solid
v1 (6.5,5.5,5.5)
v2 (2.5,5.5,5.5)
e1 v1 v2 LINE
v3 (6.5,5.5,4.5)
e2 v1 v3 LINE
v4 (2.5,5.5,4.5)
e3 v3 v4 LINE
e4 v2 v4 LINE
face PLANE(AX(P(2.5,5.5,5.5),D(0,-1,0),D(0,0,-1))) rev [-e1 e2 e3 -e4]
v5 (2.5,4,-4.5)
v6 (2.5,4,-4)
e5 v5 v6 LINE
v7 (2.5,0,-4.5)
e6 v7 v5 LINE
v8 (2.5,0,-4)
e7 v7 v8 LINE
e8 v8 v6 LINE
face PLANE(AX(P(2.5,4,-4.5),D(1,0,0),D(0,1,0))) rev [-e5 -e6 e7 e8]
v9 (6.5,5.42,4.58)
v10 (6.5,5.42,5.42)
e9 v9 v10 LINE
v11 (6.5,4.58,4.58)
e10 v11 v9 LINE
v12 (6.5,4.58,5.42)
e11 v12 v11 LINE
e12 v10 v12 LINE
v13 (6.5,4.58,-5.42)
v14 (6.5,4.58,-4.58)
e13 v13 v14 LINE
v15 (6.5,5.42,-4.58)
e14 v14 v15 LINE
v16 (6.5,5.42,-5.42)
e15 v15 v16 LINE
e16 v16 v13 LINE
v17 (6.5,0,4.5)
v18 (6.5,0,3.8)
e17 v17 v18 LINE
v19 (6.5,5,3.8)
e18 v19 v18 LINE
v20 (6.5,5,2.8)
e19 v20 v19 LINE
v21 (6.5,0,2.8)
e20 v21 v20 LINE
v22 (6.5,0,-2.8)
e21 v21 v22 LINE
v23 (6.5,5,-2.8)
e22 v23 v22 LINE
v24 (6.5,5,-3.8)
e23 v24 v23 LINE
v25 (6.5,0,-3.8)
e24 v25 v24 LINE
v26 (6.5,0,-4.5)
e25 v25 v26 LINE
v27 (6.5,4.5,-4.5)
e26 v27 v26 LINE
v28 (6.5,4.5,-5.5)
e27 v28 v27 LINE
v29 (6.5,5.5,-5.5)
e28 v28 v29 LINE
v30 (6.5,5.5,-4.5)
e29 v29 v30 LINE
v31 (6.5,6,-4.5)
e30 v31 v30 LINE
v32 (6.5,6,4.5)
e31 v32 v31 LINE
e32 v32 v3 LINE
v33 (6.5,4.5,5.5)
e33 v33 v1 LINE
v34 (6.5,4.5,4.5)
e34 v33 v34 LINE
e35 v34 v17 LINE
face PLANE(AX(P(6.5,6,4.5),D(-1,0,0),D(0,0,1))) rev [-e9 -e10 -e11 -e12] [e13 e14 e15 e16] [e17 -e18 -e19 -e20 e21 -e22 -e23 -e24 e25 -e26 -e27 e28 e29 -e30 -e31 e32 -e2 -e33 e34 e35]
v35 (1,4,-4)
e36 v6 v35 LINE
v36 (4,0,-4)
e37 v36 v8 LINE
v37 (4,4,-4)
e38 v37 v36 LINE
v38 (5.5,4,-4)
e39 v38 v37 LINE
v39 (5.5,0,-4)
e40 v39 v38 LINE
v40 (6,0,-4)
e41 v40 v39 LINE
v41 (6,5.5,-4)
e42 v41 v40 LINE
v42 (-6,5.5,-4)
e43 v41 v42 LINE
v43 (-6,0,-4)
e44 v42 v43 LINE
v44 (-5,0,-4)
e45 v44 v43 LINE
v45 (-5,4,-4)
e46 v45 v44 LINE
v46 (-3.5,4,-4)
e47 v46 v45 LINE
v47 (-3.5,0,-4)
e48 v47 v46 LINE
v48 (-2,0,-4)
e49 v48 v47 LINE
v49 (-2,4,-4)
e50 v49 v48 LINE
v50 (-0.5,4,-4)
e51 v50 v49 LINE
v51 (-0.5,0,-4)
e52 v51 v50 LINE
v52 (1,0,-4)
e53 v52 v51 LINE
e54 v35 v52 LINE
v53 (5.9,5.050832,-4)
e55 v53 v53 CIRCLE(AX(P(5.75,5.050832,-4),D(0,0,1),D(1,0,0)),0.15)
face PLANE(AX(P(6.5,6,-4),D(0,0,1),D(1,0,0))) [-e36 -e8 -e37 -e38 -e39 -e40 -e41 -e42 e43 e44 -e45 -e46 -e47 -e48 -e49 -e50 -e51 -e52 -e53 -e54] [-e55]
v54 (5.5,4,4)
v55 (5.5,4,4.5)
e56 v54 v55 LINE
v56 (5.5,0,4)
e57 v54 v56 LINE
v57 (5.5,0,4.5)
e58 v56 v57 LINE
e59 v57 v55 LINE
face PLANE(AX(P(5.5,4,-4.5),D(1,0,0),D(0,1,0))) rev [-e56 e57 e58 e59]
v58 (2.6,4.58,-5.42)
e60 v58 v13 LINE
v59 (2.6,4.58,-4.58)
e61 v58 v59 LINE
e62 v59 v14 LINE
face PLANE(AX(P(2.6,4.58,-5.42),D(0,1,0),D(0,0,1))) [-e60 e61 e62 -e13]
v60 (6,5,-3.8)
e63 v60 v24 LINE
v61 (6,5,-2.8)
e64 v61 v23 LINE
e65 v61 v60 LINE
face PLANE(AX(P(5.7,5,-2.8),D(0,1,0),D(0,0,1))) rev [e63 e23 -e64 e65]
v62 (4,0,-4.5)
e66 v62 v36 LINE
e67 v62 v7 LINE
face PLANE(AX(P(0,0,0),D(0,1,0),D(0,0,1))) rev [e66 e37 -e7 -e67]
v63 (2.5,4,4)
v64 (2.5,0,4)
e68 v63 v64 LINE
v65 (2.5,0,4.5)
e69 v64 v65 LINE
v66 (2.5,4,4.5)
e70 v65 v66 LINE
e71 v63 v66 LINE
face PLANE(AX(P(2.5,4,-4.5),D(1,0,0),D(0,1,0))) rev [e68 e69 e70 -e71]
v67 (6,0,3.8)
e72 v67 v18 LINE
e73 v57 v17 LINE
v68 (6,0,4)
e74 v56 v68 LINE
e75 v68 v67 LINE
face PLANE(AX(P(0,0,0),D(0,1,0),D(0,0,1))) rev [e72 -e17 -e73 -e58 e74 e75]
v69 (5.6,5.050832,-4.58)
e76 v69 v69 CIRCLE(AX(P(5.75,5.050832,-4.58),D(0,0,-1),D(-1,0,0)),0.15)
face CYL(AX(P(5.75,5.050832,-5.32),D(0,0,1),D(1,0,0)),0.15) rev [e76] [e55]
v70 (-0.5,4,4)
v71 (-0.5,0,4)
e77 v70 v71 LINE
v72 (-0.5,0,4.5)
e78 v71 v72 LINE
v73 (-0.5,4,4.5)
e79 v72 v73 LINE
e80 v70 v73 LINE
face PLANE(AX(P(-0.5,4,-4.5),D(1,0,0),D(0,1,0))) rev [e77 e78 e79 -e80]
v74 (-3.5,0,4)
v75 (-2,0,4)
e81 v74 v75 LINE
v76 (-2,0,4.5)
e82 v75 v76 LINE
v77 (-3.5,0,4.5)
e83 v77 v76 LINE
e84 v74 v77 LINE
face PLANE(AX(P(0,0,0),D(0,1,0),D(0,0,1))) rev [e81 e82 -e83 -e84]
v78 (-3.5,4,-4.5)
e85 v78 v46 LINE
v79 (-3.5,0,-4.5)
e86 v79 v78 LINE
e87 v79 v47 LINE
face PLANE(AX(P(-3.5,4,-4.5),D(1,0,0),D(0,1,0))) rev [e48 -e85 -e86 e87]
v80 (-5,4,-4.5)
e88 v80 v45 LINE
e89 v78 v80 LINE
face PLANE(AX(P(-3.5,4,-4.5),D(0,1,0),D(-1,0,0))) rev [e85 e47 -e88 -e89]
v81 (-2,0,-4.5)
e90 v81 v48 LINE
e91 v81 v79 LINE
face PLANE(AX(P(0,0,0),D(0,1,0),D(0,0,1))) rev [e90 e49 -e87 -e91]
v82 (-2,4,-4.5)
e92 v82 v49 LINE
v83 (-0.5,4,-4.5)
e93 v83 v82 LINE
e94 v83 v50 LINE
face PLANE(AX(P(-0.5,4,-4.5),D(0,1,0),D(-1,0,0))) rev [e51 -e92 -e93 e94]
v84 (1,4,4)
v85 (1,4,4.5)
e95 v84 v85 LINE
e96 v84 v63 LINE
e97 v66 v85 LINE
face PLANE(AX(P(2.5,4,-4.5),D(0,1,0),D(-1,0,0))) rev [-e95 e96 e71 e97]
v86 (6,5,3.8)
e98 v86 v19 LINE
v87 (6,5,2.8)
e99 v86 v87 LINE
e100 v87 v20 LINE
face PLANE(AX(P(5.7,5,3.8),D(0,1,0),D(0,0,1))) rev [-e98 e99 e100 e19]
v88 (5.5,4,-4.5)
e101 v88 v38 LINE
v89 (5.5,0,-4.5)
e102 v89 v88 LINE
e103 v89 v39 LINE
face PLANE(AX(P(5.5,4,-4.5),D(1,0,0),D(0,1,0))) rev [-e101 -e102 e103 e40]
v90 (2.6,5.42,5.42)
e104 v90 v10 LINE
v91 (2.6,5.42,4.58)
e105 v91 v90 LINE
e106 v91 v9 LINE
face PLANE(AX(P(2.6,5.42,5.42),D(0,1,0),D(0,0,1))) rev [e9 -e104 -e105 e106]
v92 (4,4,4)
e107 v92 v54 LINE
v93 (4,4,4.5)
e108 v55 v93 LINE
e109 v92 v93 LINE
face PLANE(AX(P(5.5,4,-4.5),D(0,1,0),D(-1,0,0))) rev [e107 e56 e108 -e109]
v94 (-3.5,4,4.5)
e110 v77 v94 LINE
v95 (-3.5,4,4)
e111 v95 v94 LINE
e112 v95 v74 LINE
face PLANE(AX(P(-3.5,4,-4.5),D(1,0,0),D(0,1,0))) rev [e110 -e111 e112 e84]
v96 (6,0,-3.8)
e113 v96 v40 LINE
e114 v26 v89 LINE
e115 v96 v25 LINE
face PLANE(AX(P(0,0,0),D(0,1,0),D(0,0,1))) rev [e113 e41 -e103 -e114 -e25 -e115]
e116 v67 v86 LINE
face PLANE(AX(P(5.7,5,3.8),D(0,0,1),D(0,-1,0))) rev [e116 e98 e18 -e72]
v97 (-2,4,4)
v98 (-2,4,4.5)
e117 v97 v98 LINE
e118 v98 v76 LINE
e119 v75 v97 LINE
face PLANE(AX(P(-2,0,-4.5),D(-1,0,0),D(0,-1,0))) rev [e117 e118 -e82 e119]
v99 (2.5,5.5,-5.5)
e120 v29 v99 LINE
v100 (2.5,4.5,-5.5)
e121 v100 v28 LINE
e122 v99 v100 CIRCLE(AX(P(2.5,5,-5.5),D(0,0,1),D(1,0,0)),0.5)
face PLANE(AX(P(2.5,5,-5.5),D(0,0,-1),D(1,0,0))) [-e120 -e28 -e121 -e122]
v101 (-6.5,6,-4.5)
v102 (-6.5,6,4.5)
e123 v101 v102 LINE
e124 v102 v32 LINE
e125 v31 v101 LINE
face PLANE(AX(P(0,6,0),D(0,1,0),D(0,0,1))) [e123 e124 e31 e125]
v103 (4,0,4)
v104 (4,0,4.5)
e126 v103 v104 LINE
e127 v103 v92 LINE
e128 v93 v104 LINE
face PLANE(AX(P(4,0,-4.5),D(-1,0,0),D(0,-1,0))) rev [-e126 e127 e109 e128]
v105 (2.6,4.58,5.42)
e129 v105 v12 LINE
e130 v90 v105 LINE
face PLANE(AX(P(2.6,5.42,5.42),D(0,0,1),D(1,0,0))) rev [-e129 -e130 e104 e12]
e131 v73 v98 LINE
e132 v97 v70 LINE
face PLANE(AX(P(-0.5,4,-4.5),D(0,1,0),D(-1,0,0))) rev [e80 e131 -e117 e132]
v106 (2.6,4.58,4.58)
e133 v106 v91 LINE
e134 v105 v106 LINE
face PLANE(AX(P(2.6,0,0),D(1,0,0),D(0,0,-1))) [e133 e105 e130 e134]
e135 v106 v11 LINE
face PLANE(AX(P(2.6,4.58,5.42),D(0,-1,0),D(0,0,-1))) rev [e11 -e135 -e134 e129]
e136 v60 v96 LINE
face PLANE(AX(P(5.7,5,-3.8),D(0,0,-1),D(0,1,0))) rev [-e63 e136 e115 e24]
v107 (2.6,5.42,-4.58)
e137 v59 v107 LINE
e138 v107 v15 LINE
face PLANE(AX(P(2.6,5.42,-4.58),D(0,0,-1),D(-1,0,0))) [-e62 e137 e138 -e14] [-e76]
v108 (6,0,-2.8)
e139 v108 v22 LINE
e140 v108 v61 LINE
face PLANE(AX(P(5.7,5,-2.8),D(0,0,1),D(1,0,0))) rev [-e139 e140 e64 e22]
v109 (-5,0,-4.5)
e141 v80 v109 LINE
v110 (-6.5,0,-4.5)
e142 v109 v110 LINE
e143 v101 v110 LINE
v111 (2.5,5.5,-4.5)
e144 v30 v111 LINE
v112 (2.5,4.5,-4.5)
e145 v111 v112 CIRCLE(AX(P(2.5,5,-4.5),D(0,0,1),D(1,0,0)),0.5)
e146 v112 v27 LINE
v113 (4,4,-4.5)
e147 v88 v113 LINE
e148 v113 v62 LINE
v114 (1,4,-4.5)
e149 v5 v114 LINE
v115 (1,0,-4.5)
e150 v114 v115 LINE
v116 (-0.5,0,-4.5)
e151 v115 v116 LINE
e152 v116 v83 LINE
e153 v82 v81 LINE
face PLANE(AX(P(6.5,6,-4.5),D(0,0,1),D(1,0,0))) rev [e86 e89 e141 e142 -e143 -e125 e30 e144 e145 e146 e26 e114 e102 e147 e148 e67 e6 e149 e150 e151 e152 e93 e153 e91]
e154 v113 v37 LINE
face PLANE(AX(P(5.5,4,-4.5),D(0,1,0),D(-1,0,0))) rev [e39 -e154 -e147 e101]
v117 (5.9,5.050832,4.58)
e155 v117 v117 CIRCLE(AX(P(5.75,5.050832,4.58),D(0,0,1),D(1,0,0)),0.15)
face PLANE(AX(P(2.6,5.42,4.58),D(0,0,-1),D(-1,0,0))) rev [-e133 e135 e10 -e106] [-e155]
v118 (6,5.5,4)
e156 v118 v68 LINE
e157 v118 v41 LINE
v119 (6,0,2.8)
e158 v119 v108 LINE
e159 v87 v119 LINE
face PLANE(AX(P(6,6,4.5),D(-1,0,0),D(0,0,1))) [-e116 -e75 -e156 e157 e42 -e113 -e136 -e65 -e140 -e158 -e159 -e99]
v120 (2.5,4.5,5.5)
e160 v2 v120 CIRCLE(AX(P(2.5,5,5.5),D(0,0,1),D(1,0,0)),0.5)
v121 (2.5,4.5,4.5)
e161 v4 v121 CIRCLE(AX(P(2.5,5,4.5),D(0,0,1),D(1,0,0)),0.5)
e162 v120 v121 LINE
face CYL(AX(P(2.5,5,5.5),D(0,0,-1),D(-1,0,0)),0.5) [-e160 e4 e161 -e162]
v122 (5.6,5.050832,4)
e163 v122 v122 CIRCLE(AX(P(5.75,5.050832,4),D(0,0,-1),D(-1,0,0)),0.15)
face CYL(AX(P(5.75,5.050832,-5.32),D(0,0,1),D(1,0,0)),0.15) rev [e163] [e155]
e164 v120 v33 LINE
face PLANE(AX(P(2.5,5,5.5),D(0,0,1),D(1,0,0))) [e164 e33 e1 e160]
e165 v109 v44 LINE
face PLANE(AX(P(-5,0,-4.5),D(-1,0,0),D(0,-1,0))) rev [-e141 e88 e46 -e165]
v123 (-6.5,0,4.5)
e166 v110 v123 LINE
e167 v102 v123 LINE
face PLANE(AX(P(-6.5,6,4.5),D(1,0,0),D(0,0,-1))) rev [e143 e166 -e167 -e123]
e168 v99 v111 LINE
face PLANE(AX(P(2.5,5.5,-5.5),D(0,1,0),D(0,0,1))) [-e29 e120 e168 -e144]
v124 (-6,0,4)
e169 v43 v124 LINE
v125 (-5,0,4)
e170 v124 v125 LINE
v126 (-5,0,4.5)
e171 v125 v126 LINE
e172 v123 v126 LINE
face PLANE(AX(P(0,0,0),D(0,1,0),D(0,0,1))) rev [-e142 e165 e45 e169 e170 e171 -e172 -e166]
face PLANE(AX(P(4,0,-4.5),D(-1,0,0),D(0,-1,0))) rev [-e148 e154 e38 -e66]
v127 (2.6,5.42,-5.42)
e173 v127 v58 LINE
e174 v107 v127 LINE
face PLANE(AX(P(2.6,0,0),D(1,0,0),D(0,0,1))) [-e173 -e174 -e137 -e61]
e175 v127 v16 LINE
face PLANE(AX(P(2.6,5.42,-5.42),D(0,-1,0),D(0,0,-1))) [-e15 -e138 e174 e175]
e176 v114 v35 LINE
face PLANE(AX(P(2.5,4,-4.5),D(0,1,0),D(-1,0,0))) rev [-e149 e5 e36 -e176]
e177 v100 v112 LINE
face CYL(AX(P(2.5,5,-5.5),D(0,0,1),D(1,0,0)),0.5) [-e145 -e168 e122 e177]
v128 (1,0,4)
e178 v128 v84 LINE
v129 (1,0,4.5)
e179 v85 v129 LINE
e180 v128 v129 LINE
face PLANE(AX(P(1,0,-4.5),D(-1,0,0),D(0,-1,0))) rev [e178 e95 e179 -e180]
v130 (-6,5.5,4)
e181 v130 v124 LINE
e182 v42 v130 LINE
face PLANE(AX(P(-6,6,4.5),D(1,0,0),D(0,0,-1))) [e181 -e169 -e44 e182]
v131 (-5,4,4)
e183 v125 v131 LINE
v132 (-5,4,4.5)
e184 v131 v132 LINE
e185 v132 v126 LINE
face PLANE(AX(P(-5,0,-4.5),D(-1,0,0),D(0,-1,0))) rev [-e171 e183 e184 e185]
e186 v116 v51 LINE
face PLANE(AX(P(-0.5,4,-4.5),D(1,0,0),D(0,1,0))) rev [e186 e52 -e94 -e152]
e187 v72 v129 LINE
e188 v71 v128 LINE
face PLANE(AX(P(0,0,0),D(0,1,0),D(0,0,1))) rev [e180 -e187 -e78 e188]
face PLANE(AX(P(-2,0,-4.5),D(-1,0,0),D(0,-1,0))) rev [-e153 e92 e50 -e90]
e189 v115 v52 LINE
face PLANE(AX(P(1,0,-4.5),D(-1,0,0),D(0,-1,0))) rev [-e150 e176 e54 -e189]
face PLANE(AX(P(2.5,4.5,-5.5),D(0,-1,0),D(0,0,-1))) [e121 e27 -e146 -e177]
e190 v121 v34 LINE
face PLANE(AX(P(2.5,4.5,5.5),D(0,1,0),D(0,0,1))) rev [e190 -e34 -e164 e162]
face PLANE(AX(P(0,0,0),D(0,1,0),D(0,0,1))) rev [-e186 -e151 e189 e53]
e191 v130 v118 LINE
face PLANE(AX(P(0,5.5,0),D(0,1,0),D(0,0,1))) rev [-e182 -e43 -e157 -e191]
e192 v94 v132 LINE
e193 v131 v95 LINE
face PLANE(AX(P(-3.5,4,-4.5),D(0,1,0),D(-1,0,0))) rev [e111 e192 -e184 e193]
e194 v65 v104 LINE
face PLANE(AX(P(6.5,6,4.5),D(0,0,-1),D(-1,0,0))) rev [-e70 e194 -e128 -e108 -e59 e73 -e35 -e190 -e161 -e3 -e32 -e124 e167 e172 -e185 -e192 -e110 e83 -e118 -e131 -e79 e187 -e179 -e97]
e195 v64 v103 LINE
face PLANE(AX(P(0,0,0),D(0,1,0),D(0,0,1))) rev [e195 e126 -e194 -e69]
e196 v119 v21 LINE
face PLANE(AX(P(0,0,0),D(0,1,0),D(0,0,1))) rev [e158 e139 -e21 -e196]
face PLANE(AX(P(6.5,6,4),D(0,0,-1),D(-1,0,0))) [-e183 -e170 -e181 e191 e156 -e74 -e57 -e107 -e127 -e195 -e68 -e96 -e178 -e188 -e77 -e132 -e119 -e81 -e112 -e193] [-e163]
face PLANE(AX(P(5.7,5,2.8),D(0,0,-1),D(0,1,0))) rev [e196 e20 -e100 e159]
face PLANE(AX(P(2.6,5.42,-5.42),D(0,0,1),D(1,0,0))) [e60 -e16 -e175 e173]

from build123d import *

# Parameters (mm, degrees)
SKETCH1_W           = 13
SKETCH1_H           = 9
BOSS_EXTRUDE1_DEPTH = 6
SHELL9_START        = -6
SHELL9_OUTLINE_W    = 5.5
SHELL9_OUTLINE_H    = 8
SHELL9_DEPTH        = 12
SKETCH2_W           = 1.5
SKETCH2_H           = 4
CUT_EXTRUDE2_DEPTH  = 13.619429464
BOSS_EXTRUDE2_DEPTH = 1
CUT_EXTRUDE3_DEPTH  = 1
SKETCH6_W           = 0.84
SKETCH6_H           = 0.84
CUT_EXTRUDE4_DEPTH  = 3.9
SKETCH7_R           = 0.15
CUT_EXTRUDE6_DEPTH  = 9.9
SKETCH9_W           = 1
SKETCH9_H           = 5
CUT_EXTRUDE7_DEPTH  = 0.8


# Read off the part's stored shape, not the designer's step: Shell9
with BuildPart() as part:
    # Sketch1 → Boss-Extrude1 (new body)
    with BuildSketch(Plane(origin=(0, 0, 0), x_dir=(1, 0, 0), z_dir=(0, 1, 0))):
        Rectangle(SKETCH1_W, SKETCH1_H)
    extrude(amount=BOSS_EXTRUDE1_DEPTH)

    # Shell9 outline → Shell9 (cut)
    with BuildSketch(Plane.YZ.offset(SHELL9_START)):
        with Locations((2.75, 0)):
            Rectangle(SHELL9_OUTLINE_W, SHELL9_OUTLINE_H)
    extrude(amount=SHELL9_DEPTH, mode=Mode.SUBTRACT)

    # Sketch2 → Cut-Extrude2 (cut, through all)
    with BuildSketch(Plane.XY.offset(4.5)):
        with Locations((-1.25, 2)):
            Rectangle(SKETCH2_W, SKETCH2_H)
        with Locations((-4.25, 2)):
            Rectangle(SKETCH2_W, SKETCH2_H)
        with Locations((1.75, 2)):
            Rectangle(SKETCH2_W, SKETCH2_H)
        with Locations((4.75, 2)):
            Rectangle(SKETCH2_W, SKETCH2_H)
    extrude(amount=-CUT_EXTRUDE2_DEPTH, mode=Mode.SUBTRACT)

    # Sketch3 → Boss-Extrude2 (add)
    with BuildSketch(Plane.XY.offset(4.5)):
        with BuildLine():
            Line((2.5, 4.5), (10.5, 4.5))
            ThreePointArc((10.5, 4.5), (11, 5), (10.5, 5.5))
            Line((10.5, 5.5), (2.5, 5.5))
            ThreePointArc((2.5, 5.5), (2, 5), (2.5, 4.5))
        make_face()
    boss_extrude2 = extrude(amount=BOSS_EXTRUDE2_DEPTH)

    # Sketch5 → Cut-Extrude3 (cut)
    with BuildSketch(Plane(origin=(0, 0, 4.5), x_dir=(-1, 0, 0), z_dir=(0, 0, -1))):
        with BuildLine():
            Line((-10.5, 5.5), (-6.5, 5.5))
            Line((-6.5, 5.5), (-6.5, 4.5))
            Line((-6.5, 4.5), (-10.5, 4.5))
            ThreePointArc((-10.5, 4.5), (-11, 5), (-10.5, 5.5))
        make_face()
    cut_extrude3 = extrude(amount=-CUT_EXTRUDE3_DEPTH, mode=Mode.SUBTRACT)

    # Sketch6 → Cut-Extrude4 (cut)
    with BuildSketch(Plane(origin=(6.5, 0, 0), x_dir=(0, 0, -1), z_dir=(1, 0, 0))):
        with Locations((-5, 5)):
            Rectangle(SKETCH6_W, SKETCH6_H)
    cut_extrude4 = extrude(amount=-CUT_EXTRUDE4_DEPTH, mode=Mode.SUBTRACT)

    # Mirror1: Boss-Extrude2, Cut-Extrude3, Cut-Extrude4 across plane
    add(boss_extrude2.mirror(Plane.XY))
    add(cut_extrude3.mirror(Plane.XY), mode=Mode.SUBTRACT)
    add(cut_extrude4.mirror(Plane.XY), mode=Mode.SUBTRACT)

    # Sketch7 → Cut-Extrude6 (cut)
    with BuildSketch(Plane.XY.offset(4.58)):
        with Locations((5.75, 5.050831707)):
            Circle(SKETCH7_R)
    extrude(amount=-CUT_EXTRUDE6_DEPTH, mode=Mode.SUBTRACT)

    # Sketch9 → Cut-Extrude7 (cut)
    with BuildSketch(Plane(origin=(6.5, 0, 0), x_dir=(0, 0, -1), z_dir=(1, 0, 0))):
        with Locations((-3.3, 2.5)):
            Rectangle(SKETCH9_W, SKETCH9_H)
        with Locations((3.3, 2.5)):
            Rectangle(SKETCH9_W, SKETCH9_H)
    extrude(amount=-CUT_EXTRUDE7_DEPTH, mode=Mode.SUBTRACT)


solid = part.part
